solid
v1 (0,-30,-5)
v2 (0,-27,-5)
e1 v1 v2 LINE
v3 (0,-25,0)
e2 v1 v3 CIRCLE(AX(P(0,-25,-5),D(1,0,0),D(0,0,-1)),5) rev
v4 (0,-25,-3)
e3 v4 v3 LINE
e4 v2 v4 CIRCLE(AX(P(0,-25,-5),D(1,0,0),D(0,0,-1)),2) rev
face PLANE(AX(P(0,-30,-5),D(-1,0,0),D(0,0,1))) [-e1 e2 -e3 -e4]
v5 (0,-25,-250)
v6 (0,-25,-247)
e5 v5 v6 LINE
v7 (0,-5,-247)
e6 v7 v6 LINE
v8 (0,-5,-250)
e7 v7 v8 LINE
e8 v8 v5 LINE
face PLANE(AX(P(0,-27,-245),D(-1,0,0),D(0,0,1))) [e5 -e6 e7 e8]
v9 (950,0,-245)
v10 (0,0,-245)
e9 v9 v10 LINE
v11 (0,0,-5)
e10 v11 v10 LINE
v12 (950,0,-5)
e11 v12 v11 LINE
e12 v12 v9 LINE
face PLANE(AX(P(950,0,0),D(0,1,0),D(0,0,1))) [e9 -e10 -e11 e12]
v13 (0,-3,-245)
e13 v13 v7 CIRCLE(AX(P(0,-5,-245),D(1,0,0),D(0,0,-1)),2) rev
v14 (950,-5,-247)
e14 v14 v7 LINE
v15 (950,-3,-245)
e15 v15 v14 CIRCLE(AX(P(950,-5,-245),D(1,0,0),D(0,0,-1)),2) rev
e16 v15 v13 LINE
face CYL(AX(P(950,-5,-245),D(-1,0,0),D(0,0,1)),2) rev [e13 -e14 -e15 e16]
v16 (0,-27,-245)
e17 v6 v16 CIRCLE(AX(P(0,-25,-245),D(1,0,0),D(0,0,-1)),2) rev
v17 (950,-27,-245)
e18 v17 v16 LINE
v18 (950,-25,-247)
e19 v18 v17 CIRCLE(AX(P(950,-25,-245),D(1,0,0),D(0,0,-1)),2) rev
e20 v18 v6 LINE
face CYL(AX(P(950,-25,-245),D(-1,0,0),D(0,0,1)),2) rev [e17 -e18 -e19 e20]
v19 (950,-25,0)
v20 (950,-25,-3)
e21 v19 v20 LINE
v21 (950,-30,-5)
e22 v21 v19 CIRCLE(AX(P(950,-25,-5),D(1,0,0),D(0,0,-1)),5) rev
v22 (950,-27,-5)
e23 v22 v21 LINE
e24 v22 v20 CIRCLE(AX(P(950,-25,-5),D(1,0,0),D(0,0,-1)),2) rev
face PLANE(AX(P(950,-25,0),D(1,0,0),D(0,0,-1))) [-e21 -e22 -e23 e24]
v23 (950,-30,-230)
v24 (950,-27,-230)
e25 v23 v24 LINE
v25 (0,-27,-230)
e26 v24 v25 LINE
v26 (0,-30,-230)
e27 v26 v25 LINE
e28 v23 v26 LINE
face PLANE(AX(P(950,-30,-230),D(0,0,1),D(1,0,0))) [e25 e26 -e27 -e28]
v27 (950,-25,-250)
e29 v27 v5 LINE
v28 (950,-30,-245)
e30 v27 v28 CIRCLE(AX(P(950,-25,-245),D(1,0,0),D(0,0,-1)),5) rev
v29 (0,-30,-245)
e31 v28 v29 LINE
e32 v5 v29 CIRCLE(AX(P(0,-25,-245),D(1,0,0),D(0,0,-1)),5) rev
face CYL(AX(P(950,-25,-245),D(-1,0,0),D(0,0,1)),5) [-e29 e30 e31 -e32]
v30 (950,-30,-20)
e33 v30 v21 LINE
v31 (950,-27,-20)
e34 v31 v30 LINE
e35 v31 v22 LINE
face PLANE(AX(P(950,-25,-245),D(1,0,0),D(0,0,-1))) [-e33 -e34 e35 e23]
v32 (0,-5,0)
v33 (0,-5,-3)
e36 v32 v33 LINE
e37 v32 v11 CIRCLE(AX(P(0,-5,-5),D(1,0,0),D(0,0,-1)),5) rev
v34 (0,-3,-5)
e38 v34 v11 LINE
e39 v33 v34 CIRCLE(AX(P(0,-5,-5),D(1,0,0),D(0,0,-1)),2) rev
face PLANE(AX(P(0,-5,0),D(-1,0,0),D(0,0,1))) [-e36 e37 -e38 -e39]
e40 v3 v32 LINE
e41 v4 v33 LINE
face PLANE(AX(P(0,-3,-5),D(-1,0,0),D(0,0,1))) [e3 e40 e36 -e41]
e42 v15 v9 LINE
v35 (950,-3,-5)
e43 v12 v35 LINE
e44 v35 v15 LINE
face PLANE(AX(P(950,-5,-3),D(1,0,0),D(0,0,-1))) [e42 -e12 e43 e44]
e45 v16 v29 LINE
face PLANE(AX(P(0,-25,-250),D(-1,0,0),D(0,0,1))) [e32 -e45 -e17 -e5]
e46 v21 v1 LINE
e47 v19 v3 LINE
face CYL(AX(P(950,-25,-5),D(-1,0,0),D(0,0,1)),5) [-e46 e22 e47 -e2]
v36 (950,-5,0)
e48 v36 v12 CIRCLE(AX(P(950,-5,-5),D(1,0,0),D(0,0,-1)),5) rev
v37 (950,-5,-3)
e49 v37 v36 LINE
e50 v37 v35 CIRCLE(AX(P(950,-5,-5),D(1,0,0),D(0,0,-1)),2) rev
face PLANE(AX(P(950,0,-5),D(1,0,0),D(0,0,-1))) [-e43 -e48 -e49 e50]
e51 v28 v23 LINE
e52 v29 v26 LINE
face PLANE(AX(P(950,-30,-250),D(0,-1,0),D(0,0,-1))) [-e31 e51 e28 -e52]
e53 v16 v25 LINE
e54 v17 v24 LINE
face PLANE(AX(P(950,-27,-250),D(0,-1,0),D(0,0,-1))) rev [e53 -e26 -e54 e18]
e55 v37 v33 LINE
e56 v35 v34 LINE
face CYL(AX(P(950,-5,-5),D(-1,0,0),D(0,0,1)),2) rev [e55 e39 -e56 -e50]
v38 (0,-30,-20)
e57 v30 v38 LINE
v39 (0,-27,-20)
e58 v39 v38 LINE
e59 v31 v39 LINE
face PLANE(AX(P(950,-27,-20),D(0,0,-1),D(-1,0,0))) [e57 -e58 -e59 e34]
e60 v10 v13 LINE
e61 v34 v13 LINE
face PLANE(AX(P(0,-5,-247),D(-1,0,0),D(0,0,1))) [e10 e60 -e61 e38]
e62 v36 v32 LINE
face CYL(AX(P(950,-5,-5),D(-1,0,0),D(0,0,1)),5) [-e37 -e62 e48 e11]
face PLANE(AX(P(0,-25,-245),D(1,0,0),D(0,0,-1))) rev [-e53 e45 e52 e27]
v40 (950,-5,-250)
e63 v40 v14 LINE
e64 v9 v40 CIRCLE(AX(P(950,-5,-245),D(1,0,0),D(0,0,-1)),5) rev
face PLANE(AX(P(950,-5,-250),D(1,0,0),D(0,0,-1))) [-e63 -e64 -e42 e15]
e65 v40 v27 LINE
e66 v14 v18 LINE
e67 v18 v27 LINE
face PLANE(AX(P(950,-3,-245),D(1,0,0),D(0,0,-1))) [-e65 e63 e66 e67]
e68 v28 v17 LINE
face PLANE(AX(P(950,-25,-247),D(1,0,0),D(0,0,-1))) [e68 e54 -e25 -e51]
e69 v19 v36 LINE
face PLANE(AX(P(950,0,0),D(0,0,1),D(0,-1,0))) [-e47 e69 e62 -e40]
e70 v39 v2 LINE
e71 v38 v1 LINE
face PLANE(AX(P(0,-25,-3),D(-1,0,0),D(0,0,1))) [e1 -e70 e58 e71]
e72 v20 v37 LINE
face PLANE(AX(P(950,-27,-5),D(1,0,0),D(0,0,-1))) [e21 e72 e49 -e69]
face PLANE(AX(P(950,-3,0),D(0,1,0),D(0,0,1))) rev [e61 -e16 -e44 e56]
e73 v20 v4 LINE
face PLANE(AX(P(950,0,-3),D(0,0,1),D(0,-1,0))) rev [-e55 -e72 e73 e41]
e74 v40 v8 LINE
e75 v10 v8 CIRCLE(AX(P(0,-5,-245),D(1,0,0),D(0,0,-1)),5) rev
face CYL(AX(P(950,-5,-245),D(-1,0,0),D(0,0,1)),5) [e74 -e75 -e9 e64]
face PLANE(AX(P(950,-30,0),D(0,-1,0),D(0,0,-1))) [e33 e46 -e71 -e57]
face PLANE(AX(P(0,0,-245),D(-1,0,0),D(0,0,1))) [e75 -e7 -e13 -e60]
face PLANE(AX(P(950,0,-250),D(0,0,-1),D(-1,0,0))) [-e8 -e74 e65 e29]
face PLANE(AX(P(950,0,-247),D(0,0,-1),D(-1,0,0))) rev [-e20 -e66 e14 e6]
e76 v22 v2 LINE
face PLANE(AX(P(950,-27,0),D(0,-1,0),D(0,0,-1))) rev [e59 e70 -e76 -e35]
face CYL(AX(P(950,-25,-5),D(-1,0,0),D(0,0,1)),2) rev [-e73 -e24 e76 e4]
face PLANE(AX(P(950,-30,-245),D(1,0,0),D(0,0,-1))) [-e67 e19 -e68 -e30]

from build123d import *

# Parameters (mm, degrees)
BASE_FLANGIA1_DEPTH = 950


# Sheet-metal steps are written as plain solids
with BuildPart() as part:
    # Schizzo1 → Base-Flangia1 (new body)
    with BuildSketch(Plane(origin=(0, 0, 0), x_dir=(0, 0, -1), z_dir=(1, 0, 0))):
        with BuildLine():
            Line((230, -30), (245, -30))
            ThreePointArc((245, -30), (248.535533906, -28.535533906), (250, -25))
            Line((250, -25), (250, -5))
            ThreePointArc((250, -5), (248.535533906, -1.464466094), (245, 0))
            Line((245, 0), (5, 0))
            ThreePointArc((5, 0), (1.464466094, -1.464466094), (0, -5))
            Line((0, -5), (0, -25))
            ThreePointArc((0, -25), (1.464466094, -28.535533906), (5, -30))
            Line((5, -30), (20, -30))
            Line((20, -30), (20, -27))
            Line((20, -27), (5, -27))
            ThreePointArc((5, -27), (3.585786438, -26.414213562), (3, -25))
            Line((3, -25), (3, -5))
            ThreePointArc((3, -5), (3.585786438, -3.585786438), (5, -3))
            Line((5, -3), (245, -3))
            ThreePointArc((245, -3), (246.414213562, -3.585786438), (247, -5))
            Line((247, -5), (247, -25))
            ThreePointArc((247, -25), (246.414213562, -26.414213562), (245, -27))
            Line((245, -27), (230, -27))
            Line((230, -27), (230, -30))
        make_face()
    extrude(amount=BASE_FLANGIA1_DEPTH)


solid = part.part
